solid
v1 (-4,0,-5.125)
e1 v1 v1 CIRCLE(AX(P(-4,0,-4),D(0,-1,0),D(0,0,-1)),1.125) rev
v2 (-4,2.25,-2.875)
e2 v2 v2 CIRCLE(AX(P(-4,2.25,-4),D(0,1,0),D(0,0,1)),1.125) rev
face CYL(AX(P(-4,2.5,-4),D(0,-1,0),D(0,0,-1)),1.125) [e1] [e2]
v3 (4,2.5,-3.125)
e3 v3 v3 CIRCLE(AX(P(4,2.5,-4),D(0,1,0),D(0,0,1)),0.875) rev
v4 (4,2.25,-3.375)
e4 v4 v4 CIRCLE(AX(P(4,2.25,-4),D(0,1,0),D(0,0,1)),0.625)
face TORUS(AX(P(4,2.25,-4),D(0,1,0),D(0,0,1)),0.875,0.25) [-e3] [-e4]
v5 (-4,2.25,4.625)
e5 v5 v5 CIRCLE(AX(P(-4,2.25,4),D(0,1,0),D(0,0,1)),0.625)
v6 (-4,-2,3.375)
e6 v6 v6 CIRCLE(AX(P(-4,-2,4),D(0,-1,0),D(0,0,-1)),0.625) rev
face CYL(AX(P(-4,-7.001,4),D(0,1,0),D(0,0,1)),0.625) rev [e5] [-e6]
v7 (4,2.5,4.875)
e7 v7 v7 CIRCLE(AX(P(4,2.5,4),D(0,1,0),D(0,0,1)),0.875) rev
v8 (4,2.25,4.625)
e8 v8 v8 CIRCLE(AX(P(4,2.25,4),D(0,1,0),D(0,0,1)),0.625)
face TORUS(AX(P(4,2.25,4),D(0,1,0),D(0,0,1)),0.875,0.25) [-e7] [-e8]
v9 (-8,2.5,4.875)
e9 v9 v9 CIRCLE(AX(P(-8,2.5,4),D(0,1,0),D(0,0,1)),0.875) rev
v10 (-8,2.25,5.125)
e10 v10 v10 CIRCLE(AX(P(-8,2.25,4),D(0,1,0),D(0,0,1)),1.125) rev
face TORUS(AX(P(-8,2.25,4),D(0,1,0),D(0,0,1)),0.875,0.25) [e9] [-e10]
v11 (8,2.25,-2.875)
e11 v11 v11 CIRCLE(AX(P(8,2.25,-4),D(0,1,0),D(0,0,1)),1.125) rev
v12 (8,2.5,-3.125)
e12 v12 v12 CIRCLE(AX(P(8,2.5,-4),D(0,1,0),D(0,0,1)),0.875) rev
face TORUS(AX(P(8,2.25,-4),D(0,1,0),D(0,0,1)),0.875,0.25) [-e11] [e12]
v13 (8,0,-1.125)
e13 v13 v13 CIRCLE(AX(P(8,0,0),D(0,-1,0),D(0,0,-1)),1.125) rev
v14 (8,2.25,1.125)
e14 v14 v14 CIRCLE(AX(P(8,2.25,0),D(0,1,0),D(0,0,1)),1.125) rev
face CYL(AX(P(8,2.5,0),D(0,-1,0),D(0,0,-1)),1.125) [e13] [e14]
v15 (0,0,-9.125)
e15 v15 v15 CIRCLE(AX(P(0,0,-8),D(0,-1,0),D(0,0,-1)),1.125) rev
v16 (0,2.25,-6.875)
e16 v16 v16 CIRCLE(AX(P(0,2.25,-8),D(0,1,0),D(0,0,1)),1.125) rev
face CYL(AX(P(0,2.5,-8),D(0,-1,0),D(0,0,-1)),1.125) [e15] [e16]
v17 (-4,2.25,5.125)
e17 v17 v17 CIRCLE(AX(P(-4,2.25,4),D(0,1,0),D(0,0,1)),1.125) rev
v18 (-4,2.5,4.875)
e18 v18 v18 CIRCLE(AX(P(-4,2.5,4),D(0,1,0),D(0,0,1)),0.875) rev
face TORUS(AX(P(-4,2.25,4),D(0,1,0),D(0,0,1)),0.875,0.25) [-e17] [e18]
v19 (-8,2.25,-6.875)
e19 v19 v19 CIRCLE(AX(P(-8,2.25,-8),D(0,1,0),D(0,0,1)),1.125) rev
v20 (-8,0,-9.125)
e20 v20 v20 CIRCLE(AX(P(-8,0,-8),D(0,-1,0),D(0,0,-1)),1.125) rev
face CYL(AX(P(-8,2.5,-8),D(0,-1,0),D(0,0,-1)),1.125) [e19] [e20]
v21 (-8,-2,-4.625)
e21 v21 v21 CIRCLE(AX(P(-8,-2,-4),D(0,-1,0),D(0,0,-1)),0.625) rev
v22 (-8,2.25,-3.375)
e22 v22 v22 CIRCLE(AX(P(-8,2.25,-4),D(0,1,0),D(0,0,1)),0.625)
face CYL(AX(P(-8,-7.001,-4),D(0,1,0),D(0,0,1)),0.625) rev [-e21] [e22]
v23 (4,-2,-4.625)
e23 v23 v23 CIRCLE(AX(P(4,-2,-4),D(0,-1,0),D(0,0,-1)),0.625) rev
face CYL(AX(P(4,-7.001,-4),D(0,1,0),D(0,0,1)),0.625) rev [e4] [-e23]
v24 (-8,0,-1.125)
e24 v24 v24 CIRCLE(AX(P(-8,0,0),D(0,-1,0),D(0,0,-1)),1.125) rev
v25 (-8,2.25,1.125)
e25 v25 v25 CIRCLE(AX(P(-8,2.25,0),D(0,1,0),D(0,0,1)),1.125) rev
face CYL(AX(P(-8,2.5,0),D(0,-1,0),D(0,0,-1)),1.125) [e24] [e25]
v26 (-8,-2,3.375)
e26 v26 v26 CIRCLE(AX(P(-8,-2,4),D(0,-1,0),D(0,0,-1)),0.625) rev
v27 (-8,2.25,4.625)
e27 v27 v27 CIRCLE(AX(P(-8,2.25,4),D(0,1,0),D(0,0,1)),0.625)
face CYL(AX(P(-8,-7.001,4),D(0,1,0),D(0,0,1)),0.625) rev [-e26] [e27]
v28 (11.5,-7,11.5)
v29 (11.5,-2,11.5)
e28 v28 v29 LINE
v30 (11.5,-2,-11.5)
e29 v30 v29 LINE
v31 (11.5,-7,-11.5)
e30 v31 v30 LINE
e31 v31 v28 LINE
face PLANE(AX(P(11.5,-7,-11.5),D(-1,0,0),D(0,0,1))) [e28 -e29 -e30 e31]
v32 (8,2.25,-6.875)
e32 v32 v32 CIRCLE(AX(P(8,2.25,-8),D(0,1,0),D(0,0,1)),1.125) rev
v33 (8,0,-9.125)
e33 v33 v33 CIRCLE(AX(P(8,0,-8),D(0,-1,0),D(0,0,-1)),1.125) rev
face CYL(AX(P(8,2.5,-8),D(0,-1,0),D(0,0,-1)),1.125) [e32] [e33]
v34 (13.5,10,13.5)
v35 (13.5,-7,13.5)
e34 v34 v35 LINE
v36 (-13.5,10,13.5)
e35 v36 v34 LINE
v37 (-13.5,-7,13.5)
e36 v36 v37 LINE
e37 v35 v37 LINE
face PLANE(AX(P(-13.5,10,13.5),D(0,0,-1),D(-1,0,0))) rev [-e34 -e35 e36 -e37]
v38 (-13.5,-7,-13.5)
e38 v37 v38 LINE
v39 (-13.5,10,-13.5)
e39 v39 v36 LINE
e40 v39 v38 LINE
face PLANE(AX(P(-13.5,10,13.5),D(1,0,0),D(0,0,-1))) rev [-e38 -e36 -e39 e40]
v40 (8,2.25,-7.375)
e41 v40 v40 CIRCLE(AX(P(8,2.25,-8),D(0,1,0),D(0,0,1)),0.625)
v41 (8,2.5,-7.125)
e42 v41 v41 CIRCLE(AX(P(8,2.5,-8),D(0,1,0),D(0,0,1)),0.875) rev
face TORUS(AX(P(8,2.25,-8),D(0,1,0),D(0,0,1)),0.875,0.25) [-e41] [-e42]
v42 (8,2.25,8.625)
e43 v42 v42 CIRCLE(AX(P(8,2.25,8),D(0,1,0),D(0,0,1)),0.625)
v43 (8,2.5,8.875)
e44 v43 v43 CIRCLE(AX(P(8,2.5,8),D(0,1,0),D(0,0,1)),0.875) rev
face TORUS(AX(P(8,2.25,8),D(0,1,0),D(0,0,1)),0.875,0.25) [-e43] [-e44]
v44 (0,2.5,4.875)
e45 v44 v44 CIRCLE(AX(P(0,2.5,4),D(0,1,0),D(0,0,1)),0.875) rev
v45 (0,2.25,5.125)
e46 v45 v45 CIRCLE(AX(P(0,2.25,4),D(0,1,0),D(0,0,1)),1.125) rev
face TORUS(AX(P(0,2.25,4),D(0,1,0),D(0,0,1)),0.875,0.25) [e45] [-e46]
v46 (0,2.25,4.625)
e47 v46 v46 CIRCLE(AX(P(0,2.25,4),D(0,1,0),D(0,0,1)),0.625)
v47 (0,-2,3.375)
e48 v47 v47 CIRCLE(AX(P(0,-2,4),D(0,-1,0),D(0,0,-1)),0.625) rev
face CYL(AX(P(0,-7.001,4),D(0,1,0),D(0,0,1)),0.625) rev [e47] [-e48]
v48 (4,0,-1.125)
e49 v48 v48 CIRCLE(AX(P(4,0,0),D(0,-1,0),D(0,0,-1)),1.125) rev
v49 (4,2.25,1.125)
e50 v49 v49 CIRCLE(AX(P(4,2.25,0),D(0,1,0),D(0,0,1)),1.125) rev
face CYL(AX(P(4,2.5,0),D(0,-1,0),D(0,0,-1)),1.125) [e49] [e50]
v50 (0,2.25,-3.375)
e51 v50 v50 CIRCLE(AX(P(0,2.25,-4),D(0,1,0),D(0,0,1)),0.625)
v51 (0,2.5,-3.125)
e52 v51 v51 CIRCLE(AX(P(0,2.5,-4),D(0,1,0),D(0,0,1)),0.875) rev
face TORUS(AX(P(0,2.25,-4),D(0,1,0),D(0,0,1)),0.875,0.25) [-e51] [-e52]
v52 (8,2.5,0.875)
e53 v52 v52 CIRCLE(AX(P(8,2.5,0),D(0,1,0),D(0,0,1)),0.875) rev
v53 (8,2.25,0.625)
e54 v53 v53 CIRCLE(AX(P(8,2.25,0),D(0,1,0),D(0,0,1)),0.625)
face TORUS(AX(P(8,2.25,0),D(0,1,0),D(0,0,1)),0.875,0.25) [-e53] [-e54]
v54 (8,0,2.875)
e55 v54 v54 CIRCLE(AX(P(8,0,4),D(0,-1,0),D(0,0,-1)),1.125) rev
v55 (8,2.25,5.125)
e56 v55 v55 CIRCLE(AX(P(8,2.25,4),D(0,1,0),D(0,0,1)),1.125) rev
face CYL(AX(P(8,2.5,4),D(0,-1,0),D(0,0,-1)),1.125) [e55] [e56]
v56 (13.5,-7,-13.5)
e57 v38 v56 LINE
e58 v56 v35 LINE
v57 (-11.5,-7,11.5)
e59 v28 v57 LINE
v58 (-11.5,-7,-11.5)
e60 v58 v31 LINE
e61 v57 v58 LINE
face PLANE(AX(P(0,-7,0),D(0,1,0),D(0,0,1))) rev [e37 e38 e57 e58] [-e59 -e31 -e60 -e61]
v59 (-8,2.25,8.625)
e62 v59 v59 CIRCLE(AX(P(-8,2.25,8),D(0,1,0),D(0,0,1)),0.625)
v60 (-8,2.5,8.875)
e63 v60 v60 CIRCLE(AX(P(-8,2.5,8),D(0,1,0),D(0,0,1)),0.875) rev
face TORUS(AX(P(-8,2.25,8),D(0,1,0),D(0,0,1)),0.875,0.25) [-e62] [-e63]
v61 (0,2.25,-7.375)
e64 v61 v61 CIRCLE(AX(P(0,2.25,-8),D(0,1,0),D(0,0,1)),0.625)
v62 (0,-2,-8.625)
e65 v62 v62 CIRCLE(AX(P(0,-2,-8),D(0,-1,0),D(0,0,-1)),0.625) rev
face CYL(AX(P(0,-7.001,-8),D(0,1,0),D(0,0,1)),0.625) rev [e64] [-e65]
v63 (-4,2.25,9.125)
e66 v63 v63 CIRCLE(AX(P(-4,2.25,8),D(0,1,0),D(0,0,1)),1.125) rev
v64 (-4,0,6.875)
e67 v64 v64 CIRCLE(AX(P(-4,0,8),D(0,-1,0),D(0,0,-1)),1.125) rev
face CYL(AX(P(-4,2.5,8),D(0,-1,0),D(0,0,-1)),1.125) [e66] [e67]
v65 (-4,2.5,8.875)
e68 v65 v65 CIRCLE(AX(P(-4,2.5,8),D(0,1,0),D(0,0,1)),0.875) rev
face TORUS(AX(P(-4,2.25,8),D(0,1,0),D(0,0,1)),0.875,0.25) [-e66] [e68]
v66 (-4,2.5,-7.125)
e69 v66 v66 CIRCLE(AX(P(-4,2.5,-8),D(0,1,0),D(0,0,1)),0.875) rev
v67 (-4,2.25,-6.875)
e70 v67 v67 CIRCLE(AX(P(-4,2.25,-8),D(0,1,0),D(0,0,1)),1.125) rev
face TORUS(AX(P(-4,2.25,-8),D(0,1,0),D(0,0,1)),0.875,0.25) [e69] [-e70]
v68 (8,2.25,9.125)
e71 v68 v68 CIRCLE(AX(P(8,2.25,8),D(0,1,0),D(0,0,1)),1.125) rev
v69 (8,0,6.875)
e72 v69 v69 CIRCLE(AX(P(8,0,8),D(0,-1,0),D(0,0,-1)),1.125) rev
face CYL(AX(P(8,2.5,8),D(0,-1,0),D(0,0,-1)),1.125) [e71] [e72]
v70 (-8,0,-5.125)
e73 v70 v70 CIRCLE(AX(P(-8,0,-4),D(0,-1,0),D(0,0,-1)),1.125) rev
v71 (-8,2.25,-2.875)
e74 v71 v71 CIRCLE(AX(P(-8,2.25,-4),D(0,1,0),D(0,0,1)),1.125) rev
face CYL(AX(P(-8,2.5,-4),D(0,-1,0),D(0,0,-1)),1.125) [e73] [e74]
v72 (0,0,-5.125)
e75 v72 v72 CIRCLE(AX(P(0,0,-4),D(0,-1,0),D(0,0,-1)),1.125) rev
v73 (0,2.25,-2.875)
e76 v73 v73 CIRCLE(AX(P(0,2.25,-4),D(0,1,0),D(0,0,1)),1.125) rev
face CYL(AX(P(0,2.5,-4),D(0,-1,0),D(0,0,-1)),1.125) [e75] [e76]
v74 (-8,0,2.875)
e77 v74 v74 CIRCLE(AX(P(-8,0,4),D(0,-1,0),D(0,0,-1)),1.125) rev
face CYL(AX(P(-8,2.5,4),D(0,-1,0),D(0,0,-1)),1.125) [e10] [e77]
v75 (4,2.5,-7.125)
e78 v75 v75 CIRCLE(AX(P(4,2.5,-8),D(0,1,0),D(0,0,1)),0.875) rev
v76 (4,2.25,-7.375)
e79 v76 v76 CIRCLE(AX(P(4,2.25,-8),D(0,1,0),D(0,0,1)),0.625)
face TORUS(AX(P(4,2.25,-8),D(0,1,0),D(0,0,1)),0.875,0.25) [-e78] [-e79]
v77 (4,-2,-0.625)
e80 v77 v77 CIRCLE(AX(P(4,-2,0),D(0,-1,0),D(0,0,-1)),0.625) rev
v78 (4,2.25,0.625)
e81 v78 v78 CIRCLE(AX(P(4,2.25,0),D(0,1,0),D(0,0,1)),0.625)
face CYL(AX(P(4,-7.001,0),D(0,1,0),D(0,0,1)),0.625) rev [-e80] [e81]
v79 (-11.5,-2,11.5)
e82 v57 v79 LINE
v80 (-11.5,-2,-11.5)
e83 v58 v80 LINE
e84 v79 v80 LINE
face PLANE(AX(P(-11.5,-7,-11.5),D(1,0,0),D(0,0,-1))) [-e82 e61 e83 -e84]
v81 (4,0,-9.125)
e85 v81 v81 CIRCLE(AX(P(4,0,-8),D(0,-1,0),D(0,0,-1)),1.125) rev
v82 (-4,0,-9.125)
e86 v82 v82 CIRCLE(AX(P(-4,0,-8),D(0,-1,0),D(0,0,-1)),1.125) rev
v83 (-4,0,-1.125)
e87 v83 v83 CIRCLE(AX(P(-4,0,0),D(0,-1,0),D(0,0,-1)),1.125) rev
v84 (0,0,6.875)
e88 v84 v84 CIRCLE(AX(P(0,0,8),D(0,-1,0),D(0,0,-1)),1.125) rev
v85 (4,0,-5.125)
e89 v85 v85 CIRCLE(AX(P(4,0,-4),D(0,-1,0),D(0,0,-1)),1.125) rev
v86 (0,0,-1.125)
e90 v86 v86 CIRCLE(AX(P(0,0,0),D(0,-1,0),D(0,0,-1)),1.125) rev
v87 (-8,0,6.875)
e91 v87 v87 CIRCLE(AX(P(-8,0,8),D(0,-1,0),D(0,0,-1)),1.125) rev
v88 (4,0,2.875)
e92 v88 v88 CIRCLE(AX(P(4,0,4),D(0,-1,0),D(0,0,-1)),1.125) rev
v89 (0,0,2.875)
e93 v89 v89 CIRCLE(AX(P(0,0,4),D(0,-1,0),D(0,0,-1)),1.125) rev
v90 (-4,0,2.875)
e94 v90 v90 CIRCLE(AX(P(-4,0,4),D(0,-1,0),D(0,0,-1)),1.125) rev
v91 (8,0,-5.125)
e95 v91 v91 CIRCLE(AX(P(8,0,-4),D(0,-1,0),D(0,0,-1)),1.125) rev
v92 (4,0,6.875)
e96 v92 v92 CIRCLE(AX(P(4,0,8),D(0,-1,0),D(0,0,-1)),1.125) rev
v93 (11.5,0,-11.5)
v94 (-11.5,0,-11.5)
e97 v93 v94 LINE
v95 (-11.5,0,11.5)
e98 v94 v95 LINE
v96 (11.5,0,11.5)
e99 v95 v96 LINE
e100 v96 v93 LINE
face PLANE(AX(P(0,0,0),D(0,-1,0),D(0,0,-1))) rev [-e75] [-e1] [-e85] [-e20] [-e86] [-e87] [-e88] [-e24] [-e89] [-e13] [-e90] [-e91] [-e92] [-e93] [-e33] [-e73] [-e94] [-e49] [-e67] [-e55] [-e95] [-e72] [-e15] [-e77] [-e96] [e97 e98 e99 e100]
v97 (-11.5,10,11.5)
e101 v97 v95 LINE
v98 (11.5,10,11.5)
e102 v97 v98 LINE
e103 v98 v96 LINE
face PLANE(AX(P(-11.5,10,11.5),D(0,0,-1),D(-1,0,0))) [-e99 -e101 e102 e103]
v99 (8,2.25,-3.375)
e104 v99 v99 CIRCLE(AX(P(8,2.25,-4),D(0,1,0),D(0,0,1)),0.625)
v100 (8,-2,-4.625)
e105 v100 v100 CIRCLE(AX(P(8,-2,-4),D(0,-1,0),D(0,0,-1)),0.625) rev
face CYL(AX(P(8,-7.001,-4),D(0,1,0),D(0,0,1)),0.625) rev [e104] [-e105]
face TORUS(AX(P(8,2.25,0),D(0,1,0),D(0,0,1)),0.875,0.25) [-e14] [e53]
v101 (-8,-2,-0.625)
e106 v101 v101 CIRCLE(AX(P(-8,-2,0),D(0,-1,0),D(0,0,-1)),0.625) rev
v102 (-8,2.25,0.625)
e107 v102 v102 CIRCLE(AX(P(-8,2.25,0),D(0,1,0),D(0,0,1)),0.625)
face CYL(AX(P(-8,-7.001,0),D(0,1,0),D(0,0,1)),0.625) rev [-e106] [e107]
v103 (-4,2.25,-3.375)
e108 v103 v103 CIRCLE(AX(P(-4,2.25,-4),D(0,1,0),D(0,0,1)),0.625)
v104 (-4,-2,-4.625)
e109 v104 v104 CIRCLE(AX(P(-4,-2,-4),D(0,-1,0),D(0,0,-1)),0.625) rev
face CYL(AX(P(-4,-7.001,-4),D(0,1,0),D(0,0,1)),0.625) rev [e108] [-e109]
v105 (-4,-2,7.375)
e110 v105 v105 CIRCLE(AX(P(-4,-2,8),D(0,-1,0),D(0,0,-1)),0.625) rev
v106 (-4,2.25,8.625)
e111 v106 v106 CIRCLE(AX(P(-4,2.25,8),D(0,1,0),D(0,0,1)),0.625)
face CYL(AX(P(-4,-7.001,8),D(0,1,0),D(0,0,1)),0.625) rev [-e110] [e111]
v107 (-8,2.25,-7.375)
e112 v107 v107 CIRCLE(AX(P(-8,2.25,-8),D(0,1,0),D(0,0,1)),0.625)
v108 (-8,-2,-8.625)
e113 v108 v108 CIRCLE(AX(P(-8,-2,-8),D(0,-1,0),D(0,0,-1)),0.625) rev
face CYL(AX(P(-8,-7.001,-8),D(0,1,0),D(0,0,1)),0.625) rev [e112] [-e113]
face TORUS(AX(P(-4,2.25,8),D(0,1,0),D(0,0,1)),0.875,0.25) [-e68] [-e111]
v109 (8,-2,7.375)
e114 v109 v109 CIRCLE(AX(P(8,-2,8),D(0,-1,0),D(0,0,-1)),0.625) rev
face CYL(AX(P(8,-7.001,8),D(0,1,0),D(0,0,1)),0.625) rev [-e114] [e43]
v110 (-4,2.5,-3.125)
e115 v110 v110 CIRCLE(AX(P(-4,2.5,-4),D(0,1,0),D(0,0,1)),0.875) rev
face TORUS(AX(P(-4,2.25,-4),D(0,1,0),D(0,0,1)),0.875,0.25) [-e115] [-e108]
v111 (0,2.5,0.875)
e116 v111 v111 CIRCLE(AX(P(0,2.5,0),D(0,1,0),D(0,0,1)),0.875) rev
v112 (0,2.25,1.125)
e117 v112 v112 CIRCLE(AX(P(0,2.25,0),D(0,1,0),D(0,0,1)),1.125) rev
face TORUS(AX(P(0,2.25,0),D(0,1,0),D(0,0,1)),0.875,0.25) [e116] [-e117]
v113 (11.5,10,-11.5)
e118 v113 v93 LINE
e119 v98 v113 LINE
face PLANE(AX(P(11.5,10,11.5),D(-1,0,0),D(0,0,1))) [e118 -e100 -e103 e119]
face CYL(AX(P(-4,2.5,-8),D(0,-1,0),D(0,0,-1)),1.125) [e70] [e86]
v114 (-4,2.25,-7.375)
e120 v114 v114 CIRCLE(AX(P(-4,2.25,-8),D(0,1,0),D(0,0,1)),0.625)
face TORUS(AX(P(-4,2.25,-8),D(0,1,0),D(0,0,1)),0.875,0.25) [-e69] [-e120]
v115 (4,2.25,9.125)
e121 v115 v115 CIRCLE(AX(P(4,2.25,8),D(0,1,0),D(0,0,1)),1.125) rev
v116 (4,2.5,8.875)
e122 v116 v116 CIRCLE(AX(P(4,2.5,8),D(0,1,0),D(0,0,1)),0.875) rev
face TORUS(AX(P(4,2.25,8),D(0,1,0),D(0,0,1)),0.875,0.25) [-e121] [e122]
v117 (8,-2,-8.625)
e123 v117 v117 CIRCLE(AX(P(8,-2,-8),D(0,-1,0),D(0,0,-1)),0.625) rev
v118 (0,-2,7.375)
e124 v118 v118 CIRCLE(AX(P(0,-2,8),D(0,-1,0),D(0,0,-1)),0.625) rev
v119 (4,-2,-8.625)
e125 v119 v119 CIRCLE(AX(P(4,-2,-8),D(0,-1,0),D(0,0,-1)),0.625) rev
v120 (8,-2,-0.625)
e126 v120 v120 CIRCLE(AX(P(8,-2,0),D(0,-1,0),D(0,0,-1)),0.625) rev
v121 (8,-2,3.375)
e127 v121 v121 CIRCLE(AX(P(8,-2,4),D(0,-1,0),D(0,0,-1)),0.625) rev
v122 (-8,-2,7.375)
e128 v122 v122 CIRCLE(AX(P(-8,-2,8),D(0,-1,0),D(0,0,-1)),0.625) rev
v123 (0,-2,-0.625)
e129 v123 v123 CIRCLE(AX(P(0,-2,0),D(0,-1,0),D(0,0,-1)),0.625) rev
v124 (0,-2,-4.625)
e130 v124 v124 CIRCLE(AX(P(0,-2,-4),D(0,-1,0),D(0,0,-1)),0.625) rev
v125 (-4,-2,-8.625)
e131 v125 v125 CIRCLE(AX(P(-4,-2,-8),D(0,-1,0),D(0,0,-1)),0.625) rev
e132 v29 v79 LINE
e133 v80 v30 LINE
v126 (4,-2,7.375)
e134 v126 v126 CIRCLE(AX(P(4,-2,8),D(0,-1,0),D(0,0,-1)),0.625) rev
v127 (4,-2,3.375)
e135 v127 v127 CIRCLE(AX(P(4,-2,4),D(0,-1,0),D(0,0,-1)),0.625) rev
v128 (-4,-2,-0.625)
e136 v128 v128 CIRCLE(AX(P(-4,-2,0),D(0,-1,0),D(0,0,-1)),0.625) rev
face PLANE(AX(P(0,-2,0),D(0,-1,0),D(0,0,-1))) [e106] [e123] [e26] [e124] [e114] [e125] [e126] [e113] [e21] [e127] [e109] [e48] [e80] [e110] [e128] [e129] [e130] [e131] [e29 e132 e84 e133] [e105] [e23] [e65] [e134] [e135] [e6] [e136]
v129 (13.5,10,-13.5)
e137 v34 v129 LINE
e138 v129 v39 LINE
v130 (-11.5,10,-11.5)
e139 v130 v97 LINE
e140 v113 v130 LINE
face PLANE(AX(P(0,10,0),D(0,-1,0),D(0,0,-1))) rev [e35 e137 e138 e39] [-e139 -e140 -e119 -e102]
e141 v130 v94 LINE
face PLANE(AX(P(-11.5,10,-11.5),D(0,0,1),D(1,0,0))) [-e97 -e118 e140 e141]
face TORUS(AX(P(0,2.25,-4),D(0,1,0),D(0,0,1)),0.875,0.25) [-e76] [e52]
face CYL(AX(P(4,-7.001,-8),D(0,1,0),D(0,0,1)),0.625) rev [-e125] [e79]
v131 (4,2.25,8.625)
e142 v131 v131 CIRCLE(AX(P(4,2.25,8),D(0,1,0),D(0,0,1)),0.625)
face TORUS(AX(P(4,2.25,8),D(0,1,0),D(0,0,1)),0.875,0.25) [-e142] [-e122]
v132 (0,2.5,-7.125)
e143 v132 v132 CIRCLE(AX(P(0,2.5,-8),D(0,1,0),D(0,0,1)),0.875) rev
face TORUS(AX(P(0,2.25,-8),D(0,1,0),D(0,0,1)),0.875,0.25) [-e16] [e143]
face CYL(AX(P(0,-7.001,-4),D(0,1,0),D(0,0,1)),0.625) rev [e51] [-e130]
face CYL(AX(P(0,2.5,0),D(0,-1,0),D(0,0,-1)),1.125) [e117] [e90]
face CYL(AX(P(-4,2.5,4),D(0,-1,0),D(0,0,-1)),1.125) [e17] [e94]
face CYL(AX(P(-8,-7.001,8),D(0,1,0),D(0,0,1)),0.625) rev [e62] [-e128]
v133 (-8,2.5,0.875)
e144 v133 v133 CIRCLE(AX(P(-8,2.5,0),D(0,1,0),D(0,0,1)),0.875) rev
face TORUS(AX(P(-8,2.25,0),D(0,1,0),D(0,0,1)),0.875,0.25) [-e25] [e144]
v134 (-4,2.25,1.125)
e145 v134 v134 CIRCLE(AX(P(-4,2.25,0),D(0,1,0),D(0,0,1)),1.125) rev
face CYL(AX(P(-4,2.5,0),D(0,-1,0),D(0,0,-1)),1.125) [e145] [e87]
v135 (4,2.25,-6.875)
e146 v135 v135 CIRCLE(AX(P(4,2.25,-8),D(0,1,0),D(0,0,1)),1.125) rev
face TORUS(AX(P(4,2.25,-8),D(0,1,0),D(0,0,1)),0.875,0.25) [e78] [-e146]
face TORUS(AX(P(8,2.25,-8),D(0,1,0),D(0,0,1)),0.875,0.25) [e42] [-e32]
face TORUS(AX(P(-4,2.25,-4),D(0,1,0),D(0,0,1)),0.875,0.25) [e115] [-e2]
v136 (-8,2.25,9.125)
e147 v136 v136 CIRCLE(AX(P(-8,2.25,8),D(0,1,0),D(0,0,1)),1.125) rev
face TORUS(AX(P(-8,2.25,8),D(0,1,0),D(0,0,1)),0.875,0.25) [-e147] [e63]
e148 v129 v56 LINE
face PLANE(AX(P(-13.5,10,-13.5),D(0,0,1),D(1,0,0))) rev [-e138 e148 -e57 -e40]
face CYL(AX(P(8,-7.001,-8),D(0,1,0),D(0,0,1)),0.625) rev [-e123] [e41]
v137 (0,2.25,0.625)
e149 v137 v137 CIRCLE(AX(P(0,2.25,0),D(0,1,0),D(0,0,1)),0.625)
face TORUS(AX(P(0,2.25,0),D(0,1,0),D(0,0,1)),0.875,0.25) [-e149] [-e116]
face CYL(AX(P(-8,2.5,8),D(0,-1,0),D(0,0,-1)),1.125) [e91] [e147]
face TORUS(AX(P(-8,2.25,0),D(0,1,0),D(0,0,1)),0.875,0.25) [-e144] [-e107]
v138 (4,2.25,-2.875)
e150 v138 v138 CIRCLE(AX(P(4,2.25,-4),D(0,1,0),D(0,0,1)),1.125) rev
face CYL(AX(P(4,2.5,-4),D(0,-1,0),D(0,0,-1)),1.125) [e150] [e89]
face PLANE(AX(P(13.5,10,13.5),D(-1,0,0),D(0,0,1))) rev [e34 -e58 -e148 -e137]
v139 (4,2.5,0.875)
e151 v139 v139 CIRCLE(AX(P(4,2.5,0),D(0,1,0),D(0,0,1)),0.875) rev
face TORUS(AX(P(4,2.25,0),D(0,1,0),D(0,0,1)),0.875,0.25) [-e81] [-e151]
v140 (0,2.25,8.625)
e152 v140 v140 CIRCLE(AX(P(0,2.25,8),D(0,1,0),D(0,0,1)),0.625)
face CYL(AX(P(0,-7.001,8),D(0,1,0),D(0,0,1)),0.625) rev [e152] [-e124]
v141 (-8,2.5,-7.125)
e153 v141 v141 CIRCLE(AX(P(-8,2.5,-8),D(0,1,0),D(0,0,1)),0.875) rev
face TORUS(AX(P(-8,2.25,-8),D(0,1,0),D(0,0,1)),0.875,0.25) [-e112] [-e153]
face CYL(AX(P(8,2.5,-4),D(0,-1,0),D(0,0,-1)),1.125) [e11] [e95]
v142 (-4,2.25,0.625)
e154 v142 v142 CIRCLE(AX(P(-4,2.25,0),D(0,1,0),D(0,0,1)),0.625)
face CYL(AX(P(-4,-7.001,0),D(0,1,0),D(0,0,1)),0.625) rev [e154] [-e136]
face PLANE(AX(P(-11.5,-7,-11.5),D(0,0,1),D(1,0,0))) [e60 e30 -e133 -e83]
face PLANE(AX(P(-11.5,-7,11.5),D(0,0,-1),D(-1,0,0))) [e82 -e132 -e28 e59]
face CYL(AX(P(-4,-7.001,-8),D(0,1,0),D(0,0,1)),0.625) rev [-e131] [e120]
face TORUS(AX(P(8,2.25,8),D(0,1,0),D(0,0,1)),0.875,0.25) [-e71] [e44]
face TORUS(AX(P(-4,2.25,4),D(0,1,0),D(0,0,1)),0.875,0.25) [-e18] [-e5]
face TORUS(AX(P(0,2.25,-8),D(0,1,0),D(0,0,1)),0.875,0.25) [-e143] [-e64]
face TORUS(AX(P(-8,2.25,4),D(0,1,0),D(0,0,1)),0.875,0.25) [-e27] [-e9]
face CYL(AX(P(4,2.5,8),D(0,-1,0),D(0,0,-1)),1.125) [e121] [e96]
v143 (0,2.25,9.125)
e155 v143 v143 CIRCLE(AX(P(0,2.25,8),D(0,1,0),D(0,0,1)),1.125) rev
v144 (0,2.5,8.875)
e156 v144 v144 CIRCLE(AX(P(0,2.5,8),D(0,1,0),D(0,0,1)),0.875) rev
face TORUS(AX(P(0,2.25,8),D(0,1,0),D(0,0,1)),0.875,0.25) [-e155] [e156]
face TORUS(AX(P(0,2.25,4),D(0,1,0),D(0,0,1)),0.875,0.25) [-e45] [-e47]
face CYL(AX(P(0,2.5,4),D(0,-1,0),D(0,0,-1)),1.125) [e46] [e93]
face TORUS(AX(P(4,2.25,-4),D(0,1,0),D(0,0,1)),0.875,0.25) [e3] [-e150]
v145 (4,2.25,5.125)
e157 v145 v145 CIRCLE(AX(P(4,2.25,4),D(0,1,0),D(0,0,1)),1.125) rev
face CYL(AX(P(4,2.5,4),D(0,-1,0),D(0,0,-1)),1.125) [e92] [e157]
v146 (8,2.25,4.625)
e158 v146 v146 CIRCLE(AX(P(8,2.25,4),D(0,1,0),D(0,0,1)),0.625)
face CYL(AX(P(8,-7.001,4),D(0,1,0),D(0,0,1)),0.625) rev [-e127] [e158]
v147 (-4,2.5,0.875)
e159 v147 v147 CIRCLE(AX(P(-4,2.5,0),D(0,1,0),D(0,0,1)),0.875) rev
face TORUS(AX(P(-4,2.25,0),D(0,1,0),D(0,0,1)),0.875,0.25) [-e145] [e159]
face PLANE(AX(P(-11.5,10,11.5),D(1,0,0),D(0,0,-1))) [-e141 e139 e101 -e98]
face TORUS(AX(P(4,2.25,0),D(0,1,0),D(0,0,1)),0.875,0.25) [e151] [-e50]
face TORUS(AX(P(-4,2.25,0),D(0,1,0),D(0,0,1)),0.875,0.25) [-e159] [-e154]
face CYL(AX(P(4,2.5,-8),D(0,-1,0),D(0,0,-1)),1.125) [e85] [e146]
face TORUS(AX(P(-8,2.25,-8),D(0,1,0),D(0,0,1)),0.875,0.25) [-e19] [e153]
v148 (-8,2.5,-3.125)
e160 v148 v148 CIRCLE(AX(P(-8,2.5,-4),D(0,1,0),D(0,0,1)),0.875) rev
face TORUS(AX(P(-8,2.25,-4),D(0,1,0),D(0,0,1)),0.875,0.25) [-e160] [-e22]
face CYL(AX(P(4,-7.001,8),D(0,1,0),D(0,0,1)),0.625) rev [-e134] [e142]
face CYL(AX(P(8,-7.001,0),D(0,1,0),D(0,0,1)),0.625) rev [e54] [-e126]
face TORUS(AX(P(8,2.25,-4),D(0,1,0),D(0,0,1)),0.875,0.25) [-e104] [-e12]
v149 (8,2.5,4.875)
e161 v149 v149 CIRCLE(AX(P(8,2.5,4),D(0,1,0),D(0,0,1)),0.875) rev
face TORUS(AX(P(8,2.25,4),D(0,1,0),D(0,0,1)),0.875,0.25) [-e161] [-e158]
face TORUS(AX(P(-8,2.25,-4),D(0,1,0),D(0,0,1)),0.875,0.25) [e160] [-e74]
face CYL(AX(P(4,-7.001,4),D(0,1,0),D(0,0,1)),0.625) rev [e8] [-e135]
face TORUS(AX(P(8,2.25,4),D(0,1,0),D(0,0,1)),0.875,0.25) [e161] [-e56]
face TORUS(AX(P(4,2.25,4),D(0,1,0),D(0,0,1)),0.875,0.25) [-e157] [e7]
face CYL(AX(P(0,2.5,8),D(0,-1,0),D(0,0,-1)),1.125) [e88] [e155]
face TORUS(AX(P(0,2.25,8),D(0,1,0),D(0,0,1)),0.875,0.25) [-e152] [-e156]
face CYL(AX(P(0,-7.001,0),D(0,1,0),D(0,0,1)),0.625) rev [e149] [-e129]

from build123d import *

# Parameters (mm, degrees)
SKETCH1_W              = 27
SKETCH1_H              = 27
SKETCH1_W_2            = 23
SKETCH1_H_2            = 23
BOSS_EXTRUDE1_DEPTH    = 10
SKETCH2_W              = 27
SKETCH2_H              = 27
BOSS_EXTRUDE2_DEPTH    = 2
SKETCH3_W              = 27
SKETCH3_H              = 27
SKETCH3_W_2            = 23
SKETCH3_H_2            = 23
BOSS_EXTRUDE3_DEPTH    = 5
SKETCH6_R              = 1.125
BOSS_EXTRUDE5_DEPTH    = 2.5
CUT_EXTRUDE2_REACH     = 23.325
SKETCH7_R              = 0.625
FILLET3_R              = 0.25
LPATTERN1_COUNT        = 5
LPATTERN1_PITCH        = 4
LPATTERN1_COUNT_DIR2   = 5
LPATTERN1_PITCH_DIR2   = 4
FILLET3_OF_LPATTERN1_R = 0.25


with BuildPart() as part:
    # Sketch1 → Boss-Extrude1 (new body)
    with BuildSketch(Plane(origin=(0, 0, 0), x_dir=(1, 0, 0), z_dir=(0, 1, 0))):
        Rectangle(SKETCH1_W, SKETCH1_H)
        Rectangle(SKETCH1_W_2, SKETCH1_H_2, mode=Mode.SUBTRACT)
    extrude(amount=BOSS_EXTRUDE1_DEPTH)

    # Sketch2 → Boss-Extrude2 (add)
    with BuildSketch(Plane.XZ):
        Rectangle(SKETCH2_W, SKETCH2_H)
    extrude(amount=BOSS_EXTRUDE2_DEPTH)

    # Sketch3 → Boss-Extrude3 (add)
    with BuildSketch(Plane.XZ.offset(2)):
        Rectangle(SKETCH3_W, SKETCH3_H)
        Rectangle(SKETCH3_W_2, SKETCH3_H_2, mode=Mode.SUBTRACT)
    extrude(amount=BOSS_EXTRUDE3_DEPTH)

    # Sketch6 → Boss-Extrude5 (add)
    with BuildSketch(Plane(origin=(0, 0, 0), x_dir=(1, 0, 0), z_dir=(0, 1, 0))):
        with Locations(Location((8, 8, 0), (0, 0, 90))):
            Circle(SKETCH6_R)
    boss_extrude5 = extrude(amount=BOSS_EXTRUDE5_DEPTH)

    # Sketch7 → Cut-Extrude2 (cut, up to next)
    with BuildSketch(Plane(origin=(0, 2.5, 0), x_dir=(1, 0, 0), z_dir=(0, 1, 0)), mode=Mode.PRIVATE) as cut_extrude2_sk1:
        with Locations(Location((8, 8, 0), (0, 0, 270))):
            Circle(SKETCH7_R)
    cut_extrude2_tool1 = extrude(cut_extrude2_sk1.sketch, amount=-CUT_EXTRUDE2_REACH, mode=Mode.PRIVATE) & part.part
    cut_extrude2 = cut_extrude2_tool1.solids().sort_by_distance((8, 2.5, -8))[0]
    add(cut_extrude2, mode=Mode.SUBTRACT)

    # Fillet3
    fillet3_edges = [part.edges().sort_by_distance(p)[0] for p in [
        (8, 2.5, -6.875),
        (8, 2.5, -8.625),
    ]]
    fillet(fillet3_edges, radius=FILLET3_R - 0.0001)  # a hair under: the kernel refuses the full size

    # LPattern1: Boss-Extrude5, Cut-Extrude2 5 × 5
    with Locations(*[(-j * LPATTERN1_PITCH_DIR2, 0, i * LPATTERN1_PITCH) for i in range(LPATTERN1_COUNT) for j in range(LPATTERN1_COUNT_DIR2) if (i, j) != (0, 0)]):
        add(boss_extrude5)
        add(cut_extrude2, mode=Mode.SUBTRACT)

    # Fillet3 of LPattern1
    fillet3_of_lpattern1_edges = [part.edges().sort_by_distance(p)[0] for p in [
        (4, 2.5, -6.875),
        (4, 2.5, -8.625),
        (0, 2.5, -6.875),
        (0, 2.5, -8.625),
        (-4, 2.5, -6.875),
        (-4, 2.5, -8.625),
        (-8, 2.5, -6.875),
        (-8, 2.5, -8.625),
        (8, 2.5, -2.875),
        (8, 2.5, -4.625),
        (4, 2.5, -2.875),
        (4, 2.5, -4.625),
        (0, 2.5, -2.875),
        (0, 2.5, -4.625),
        (-4, 2.5, -2.875),
        (-4, 2.5, -4.625),
        (-8, 2.5, -2.875),
        (-8, 2.5, -4.625),
        (8, 2.5, 1.125),
        (8, 2.5, -0.625),
        (4, 2.5, 1.125),
        (4, 2.5, -0.625),
        (0, 2.5, 1.125),
        (0, 2.5, -0.625),
        (-4, 2.5, 1.125),
        (-4, 2.5, -0.625),
        (-8, 2.5, 1.125),
        (-8, 2.5, -0.625),
        (8, 2.5, 5.125),
        (8, 2.5, 3.375),
        (4, 2.5, 5.125),
        (4, 2.5, 3.375),
        (0, 2.5, 5.125),
        (0, 2.5, 3.375),
        (-4, 2.5, 5.125),
        (-4, 2.5, 3.375),
        (-8, 2.5, 5.125),
        (-8, 2.5, 3.375),
        (8, 2.5, 9.125),
        (8, 2.5, 7.375),
        (4, 2.5, 9.125),
        (4, 2.5, 7.375),
        (0, 2.5, 9.125),
        (0, 2.5, 7.375),
        (-4, 2.5, 9.125),
        (-4, 2.5, 7.375),
        (-8, 2.5, 9.125),
        (-8, 2.5, 7.375),
    ]]
    fillet(fillet3_of_lpattern1_edges, radius=FILLET3_OF_LPATTERN1_R - 0.0001)  # a hair under: the kernel refuses the full size


solid = part.part
